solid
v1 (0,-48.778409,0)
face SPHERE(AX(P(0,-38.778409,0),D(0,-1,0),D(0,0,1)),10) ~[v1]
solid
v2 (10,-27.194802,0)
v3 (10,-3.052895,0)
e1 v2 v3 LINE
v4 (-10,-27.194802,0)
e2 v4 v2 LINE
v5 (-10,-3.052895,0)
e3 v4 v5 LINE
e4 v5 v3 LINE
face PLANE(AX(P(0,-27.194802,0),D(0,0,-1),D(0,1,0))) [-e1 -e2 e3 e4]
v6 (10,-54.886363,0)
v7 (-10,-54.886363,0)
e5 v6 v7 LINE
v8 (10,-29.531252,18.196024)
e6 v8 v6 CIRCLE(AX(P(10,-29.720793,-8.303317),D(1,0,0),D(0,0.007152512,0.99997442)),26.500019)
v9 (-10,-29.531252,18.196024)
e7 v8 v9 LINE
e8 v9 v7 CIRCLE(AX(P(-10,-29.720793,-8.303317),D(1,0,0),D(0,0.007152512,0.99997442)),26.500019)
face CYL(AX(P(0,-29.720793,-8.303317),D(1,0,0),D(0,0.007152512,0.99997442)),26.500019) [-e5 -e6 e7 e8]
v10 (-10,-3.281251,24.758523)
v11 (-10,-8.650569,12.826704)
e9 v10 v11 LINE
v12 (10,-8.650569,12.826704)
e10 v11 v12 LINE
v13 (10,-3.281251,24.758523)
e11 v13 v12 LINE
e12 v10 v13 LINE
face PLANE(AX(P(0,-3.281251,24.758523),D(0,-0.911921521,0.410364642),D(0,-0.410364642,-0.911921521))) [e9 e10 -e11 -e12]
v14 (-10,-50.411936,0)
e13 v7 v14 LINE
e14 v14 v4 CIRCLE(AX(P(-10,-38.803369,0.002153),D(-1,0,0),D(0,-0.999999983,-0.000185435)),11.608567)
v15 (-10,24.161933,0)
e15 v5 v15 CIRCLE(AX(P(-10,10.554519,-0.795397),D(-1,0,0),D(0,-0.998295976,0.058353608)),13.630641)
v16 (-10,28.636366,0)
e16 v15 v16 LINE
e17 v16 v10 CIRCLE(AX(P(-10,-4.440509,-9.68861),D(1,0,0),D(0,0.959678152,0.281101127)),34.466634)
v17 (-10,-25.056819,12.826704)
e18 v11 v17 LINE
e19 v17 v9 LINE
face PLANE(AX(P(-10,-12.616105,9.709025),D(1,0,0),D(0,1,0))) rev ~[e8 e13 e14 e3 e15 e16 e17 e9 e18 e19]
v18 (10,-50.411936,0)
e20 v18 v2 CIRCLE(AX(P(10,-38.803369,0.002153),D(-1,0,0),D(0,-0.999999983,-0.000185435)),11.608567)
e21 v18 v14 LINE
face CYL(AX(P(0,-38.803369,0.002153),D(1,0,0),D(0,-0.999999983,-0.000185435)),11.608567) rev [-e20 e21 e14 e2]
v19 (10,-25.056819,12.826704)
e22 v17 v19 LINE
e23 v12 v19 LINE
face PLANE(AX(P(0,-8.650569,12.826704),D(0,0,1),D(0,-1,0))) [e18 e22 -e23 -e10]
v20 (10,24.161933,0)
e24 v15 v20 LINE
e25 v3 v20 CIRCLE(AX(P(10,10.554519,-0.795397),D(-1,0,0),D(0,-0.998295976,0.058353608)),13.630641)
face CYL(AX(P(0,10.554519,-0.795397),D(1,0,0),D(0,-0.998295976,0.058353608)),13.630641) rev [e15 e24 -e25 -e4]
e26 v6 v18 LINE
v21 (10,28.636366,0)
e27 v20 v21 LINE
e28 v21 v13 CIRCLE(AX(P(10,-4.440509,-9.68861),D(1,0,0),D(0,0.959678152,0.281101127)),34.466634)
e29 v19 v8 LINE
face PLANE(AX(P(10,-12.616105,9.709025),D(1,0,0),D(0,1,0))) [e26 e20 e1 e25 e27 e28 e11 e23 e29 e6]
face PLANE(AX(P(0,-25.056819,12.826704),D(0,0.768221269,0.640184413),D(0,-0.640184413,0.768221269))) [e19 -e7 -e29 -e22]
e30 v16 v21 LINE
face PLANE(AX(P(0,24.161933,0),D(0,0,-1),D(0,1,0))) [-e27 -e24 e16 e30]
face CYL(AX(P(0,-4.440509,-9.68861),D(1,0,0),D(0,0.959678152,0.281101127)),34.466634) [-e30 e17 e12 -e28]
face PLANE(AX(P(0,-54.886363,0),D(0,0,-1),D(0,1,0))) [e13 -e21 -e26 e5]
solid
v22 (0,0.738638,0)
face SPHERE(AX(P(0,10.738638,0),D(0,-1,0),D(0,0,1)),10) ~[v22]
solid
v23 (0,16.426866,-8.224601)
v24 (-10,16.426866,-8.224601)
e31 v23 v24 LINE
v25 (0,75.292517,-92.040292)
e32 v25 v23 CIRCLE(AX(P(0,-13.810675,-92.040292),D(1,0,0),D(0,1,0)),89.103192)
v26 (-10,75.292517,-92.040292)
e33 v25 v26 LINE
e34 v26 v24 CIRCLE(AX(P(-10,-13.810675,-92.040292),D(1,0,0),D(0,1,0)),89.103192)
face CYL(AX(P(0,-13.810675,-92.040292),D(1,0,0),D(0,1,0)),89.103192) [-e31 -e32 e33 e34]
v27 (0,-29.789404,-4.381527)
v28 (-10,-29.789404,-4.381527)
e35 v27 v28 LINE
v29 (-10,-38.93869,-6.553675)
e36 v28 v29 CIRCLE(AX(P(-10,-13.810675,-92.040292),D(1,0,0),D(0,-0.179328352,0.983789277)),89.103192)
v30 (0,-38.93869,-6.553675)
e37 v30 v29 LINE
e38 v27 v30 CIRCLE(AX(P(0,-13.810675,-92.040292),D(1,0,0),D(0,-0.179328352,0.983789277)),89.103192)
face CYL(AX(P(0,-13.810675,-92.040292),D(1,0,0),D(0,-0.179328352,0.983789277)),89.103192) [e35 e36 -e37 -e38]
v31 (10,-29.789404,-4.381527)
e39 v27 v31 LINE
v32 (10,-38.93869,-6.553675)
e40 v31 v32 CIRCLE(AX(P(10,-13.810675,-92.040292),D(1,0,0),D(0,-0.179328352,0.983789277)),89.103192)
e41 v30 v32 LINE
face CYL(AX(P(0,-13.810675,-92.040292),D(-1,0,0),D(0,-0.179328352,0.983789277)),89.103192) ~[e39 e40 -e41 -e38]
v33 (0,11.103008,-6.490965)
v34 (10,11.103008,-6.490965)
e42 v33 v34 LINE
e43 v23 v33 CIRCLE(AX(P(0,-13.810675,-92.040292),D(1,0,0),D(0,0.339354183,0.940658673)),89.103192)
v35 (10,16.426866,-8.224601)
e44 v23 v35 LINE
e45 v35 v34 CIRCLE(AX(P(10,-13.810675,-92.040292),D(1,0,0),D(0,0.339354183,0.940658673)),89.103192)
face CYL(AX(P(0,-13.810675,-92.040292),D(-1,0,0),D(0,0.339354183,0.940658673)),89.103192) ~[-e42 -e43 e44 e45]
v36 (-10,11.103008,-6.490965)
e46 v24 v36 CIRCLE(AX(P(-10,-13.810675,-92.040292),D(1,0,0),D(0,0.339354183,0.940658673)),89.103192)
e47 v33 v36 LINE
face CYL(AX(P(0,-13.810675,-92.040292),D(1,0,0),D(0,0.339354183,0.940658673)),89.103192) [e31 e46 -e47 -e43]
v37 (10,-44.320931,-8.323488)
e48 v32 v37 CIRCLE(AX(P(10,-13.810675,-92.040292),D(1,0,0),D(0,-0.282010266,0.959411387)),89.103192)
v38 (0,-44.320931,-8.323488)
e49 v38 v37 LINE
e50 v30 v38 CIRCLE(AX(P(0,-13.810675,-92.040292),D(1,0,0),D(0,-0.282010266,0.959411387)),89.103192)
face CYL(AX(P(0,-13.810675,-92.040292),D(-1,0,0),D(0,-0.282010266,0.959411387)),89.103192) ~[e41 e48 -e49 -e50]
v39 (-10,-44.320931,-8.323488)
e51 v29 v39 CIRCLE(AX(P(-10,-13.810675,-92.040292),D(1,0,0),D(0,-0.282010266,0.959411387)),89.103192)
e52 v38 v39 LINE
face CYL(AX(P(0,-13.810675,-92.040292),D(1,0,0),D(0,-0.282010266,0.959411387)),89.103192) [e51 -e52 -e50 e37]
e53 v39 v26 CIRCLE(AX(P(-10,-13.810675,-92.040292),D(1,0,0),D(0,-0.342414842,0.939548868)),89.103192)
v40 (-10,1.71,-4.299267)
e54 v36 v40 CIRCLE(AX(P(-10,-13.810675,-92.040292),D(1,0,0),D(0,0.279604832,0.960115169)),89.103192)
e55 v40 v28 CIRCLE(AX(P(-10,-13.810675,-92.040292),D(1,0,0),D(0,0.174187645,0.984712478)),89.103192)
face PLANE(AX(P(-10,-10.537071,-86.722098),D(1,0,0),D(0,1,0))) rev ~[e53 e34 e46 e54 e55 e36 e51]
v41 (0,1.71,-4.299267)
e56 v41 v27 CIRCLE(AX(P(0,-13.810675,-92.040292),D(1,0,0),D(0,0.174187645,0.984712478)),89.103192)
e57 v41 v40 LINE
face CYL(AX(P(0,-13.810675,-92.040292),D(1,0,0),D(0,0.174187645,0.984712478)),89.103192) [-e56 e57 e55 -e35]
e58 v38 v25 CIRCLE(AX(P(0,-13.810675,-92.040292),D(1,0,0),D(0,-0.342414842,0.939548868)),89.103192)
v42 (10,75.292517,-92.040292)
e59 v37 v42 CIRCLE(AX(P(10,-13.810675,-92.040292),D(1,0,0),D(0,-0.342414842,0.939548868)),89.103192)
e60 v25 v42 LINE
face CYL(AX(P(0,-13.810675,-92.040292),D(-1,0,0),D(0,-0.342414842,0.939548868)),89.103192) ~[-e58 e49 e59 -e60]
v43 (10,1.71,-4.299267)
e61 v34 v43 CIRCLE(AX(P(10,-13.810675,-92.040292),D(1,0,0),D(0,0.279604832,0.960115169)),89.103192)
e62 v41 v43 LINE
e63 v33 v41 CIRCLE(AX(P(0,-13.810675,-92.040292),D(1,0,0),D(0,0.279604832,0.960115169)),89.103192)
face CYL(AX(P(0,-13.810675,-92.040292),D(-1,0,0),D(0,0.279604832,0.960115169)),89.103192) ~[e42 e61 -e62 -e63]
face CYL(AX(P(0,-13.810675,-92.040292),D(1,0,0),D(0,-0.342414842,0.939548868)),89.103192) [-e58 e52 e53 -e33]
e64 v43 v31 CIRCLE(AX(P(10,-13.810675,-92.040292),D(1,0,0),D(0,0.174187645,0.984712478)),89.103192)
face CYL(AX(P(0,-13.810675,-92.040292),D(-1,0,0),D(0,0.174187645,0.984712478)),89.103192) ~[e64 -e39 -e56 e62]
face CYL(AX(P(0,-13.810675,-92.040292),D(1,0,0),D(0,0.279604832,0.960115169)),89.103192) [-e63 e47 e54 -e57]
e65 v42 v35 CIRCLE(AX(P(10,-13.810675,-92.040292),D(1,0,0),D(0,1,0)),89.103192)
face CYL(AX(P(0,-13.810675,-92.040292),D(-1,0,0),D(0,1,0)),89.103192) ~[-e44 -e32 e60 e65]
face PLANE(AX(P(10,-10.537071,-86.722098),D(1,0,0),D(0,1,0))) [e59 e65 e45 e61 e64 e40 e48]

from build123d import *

# Parameters (mm, degrees)
F2_DEPTH      = 10
F2_DEPTH_BACK = 10
F3_DEPTH      = 10
F3_DEPTH_BACK = 10


with BuildPart() as f1:
    # F0 (on Right) → F1 (revolve)
    with BuildSketch(Plane.YZ):
        with BuildLine():
            Line((-38.7784093618, 0), (-28.7784093618, 0))
            ThreePointArc((-28.7784093618, 0), (-38.7784093618, 10), (-48.7784093618, 0))
            Line((-48.7784093618, 0), (-38.7784093618, 0))
        make_face()
    revolve(axis=Axis((0, -14.0198855661, 0), (0, 1, 0)))


with BuildPart() as f1b:
    # F0 (on Right) → F1, piece 2 (revolve)
    with BuildSketch(Plane.YZ):
        with BuildLine():
            ThreePointArc((20.7386382297, 0), (10.7386382297, 10), (0.7386382297, 0))
            Line((0.7386382297, 0), (10.7386382297, 0))
            Line((10.7386382297, 0), (20.7386382297, 0))
        make_face()
    revolve(axis=Axis((0, -14.0198855661, 0), (0, 1, 0)))


with BuildPart() as f2:
    # F0 (on Right) → F2 (new body, two sides)
    with BuildSketch(Plane.YZ) as f2_sk:
        with BuildLine():
            ThreePointArc((-50.4119358957, 0), (-38.8033691557, 11.6107195707), (-27.1948024158, 0))
            Line((-27.1948024158, 0), (-3.0528949055, 0))
            ThreePointArc((-3.0528949055, 0), (10.5545190422, 12.8352438109), (24.16193299, 0))
            Line((24.16193299, 0), (28.6363661289, 0))
            ThreePointArc((28.6363661289, 0), (16.6846966655, 17.5450922675), (-3.2812512945, 24.7585233301))
            Line((-3.2812512945, 24.7585233301), (-8.6505692452, 12.8267044201))
            Line((-8.6505692452, 12.8267044201), (-25.0568185002, 12.8267044201))
            Line((-25.0568185002, 12.8267044201), (-29.5312516391, 18.1960240006))
            ThreePointArc((-29.5312516391, 18.1960240006), (-45.1714995095, 13.2263526785), (-54.8863634467, 0))
            Line((-54.8863634467, 0), (-50.4119358957, 0))
        make_face()
    extrude(amount=F2_DEPTH)
    extrude(f2_sk.sketch, amount=-F2_DEPTH_BACK)


with BuildPart() as f3:
    # F0 (on Right) → F3 (new body, two sides)
    with BuildSketch(Plane.YZ) as f3_sk:
        with BuildLine():
            ThreePointArc((1.7100001057, -4.2992666382), (-14.0433656752, -2.9374034586), (-29.7894036735, -4.3815267585))
            ThreePointArc((-29.7894036735, -4.3815267585), (-36.1603319482, -9.6512004775), (-44.3209305081, -8.3234884119))
            ThreePointArc((-44.3209305081, -8.3234884119), (-64.9028354001, -165.0400861413), (75.2925169547, -92.0402916829))
            ThreePointArc((75.2925169547, -92.0402916829), (59.1058533817, -40.8293679595), (16.426865836, -8.2246013094))
            ThreePointArc((16.426865836, -8.2246013094), (8.1614985989, -9.662212548), (1.7100001057, -4.2992666382))
        make_face()
        with BuildLine():
            ThreePointArc((-44.3209305081, -8.3234884119), (-36.1603319482, -9.6512004775), (-29.7894036735, -4.3815267585))
            ThreePointArc((-29.7894036735, -4.3815267585), (-34.3927217868, -5.3468190964), (-38.9386899769, -6.5536745824))
            ThreePointArc((-38.9386899769, -6.5536745824), (-41.6438808141, -7.3957910072), (-44.3209305081, -8.3234884119))
        make_face()
        with BuildLine():
            ThreePointArc((11.1030079424, -6.4909653738), (6.4361818801, -5.2679250151), (1.7100001057, -4.2992666382))
            ThreePointArc((1.7100001057, -4.2992666382), (8.1614985989, -9.662212548), (16.426865836, -8.2246013094))
            ThreePointArc((16.426865836, -8.2246013094), (13.7785574006, -7.315955836), (11.1030079424, -6.4909653738))
        make_face()
    extrude(amount=F3_DEPTH)
    extrude(f3_sk.sketch, amount=-F3_DEPTH_BACK)


solid = Compound([f1.part, f1b.part, f2.part, f3.part])
